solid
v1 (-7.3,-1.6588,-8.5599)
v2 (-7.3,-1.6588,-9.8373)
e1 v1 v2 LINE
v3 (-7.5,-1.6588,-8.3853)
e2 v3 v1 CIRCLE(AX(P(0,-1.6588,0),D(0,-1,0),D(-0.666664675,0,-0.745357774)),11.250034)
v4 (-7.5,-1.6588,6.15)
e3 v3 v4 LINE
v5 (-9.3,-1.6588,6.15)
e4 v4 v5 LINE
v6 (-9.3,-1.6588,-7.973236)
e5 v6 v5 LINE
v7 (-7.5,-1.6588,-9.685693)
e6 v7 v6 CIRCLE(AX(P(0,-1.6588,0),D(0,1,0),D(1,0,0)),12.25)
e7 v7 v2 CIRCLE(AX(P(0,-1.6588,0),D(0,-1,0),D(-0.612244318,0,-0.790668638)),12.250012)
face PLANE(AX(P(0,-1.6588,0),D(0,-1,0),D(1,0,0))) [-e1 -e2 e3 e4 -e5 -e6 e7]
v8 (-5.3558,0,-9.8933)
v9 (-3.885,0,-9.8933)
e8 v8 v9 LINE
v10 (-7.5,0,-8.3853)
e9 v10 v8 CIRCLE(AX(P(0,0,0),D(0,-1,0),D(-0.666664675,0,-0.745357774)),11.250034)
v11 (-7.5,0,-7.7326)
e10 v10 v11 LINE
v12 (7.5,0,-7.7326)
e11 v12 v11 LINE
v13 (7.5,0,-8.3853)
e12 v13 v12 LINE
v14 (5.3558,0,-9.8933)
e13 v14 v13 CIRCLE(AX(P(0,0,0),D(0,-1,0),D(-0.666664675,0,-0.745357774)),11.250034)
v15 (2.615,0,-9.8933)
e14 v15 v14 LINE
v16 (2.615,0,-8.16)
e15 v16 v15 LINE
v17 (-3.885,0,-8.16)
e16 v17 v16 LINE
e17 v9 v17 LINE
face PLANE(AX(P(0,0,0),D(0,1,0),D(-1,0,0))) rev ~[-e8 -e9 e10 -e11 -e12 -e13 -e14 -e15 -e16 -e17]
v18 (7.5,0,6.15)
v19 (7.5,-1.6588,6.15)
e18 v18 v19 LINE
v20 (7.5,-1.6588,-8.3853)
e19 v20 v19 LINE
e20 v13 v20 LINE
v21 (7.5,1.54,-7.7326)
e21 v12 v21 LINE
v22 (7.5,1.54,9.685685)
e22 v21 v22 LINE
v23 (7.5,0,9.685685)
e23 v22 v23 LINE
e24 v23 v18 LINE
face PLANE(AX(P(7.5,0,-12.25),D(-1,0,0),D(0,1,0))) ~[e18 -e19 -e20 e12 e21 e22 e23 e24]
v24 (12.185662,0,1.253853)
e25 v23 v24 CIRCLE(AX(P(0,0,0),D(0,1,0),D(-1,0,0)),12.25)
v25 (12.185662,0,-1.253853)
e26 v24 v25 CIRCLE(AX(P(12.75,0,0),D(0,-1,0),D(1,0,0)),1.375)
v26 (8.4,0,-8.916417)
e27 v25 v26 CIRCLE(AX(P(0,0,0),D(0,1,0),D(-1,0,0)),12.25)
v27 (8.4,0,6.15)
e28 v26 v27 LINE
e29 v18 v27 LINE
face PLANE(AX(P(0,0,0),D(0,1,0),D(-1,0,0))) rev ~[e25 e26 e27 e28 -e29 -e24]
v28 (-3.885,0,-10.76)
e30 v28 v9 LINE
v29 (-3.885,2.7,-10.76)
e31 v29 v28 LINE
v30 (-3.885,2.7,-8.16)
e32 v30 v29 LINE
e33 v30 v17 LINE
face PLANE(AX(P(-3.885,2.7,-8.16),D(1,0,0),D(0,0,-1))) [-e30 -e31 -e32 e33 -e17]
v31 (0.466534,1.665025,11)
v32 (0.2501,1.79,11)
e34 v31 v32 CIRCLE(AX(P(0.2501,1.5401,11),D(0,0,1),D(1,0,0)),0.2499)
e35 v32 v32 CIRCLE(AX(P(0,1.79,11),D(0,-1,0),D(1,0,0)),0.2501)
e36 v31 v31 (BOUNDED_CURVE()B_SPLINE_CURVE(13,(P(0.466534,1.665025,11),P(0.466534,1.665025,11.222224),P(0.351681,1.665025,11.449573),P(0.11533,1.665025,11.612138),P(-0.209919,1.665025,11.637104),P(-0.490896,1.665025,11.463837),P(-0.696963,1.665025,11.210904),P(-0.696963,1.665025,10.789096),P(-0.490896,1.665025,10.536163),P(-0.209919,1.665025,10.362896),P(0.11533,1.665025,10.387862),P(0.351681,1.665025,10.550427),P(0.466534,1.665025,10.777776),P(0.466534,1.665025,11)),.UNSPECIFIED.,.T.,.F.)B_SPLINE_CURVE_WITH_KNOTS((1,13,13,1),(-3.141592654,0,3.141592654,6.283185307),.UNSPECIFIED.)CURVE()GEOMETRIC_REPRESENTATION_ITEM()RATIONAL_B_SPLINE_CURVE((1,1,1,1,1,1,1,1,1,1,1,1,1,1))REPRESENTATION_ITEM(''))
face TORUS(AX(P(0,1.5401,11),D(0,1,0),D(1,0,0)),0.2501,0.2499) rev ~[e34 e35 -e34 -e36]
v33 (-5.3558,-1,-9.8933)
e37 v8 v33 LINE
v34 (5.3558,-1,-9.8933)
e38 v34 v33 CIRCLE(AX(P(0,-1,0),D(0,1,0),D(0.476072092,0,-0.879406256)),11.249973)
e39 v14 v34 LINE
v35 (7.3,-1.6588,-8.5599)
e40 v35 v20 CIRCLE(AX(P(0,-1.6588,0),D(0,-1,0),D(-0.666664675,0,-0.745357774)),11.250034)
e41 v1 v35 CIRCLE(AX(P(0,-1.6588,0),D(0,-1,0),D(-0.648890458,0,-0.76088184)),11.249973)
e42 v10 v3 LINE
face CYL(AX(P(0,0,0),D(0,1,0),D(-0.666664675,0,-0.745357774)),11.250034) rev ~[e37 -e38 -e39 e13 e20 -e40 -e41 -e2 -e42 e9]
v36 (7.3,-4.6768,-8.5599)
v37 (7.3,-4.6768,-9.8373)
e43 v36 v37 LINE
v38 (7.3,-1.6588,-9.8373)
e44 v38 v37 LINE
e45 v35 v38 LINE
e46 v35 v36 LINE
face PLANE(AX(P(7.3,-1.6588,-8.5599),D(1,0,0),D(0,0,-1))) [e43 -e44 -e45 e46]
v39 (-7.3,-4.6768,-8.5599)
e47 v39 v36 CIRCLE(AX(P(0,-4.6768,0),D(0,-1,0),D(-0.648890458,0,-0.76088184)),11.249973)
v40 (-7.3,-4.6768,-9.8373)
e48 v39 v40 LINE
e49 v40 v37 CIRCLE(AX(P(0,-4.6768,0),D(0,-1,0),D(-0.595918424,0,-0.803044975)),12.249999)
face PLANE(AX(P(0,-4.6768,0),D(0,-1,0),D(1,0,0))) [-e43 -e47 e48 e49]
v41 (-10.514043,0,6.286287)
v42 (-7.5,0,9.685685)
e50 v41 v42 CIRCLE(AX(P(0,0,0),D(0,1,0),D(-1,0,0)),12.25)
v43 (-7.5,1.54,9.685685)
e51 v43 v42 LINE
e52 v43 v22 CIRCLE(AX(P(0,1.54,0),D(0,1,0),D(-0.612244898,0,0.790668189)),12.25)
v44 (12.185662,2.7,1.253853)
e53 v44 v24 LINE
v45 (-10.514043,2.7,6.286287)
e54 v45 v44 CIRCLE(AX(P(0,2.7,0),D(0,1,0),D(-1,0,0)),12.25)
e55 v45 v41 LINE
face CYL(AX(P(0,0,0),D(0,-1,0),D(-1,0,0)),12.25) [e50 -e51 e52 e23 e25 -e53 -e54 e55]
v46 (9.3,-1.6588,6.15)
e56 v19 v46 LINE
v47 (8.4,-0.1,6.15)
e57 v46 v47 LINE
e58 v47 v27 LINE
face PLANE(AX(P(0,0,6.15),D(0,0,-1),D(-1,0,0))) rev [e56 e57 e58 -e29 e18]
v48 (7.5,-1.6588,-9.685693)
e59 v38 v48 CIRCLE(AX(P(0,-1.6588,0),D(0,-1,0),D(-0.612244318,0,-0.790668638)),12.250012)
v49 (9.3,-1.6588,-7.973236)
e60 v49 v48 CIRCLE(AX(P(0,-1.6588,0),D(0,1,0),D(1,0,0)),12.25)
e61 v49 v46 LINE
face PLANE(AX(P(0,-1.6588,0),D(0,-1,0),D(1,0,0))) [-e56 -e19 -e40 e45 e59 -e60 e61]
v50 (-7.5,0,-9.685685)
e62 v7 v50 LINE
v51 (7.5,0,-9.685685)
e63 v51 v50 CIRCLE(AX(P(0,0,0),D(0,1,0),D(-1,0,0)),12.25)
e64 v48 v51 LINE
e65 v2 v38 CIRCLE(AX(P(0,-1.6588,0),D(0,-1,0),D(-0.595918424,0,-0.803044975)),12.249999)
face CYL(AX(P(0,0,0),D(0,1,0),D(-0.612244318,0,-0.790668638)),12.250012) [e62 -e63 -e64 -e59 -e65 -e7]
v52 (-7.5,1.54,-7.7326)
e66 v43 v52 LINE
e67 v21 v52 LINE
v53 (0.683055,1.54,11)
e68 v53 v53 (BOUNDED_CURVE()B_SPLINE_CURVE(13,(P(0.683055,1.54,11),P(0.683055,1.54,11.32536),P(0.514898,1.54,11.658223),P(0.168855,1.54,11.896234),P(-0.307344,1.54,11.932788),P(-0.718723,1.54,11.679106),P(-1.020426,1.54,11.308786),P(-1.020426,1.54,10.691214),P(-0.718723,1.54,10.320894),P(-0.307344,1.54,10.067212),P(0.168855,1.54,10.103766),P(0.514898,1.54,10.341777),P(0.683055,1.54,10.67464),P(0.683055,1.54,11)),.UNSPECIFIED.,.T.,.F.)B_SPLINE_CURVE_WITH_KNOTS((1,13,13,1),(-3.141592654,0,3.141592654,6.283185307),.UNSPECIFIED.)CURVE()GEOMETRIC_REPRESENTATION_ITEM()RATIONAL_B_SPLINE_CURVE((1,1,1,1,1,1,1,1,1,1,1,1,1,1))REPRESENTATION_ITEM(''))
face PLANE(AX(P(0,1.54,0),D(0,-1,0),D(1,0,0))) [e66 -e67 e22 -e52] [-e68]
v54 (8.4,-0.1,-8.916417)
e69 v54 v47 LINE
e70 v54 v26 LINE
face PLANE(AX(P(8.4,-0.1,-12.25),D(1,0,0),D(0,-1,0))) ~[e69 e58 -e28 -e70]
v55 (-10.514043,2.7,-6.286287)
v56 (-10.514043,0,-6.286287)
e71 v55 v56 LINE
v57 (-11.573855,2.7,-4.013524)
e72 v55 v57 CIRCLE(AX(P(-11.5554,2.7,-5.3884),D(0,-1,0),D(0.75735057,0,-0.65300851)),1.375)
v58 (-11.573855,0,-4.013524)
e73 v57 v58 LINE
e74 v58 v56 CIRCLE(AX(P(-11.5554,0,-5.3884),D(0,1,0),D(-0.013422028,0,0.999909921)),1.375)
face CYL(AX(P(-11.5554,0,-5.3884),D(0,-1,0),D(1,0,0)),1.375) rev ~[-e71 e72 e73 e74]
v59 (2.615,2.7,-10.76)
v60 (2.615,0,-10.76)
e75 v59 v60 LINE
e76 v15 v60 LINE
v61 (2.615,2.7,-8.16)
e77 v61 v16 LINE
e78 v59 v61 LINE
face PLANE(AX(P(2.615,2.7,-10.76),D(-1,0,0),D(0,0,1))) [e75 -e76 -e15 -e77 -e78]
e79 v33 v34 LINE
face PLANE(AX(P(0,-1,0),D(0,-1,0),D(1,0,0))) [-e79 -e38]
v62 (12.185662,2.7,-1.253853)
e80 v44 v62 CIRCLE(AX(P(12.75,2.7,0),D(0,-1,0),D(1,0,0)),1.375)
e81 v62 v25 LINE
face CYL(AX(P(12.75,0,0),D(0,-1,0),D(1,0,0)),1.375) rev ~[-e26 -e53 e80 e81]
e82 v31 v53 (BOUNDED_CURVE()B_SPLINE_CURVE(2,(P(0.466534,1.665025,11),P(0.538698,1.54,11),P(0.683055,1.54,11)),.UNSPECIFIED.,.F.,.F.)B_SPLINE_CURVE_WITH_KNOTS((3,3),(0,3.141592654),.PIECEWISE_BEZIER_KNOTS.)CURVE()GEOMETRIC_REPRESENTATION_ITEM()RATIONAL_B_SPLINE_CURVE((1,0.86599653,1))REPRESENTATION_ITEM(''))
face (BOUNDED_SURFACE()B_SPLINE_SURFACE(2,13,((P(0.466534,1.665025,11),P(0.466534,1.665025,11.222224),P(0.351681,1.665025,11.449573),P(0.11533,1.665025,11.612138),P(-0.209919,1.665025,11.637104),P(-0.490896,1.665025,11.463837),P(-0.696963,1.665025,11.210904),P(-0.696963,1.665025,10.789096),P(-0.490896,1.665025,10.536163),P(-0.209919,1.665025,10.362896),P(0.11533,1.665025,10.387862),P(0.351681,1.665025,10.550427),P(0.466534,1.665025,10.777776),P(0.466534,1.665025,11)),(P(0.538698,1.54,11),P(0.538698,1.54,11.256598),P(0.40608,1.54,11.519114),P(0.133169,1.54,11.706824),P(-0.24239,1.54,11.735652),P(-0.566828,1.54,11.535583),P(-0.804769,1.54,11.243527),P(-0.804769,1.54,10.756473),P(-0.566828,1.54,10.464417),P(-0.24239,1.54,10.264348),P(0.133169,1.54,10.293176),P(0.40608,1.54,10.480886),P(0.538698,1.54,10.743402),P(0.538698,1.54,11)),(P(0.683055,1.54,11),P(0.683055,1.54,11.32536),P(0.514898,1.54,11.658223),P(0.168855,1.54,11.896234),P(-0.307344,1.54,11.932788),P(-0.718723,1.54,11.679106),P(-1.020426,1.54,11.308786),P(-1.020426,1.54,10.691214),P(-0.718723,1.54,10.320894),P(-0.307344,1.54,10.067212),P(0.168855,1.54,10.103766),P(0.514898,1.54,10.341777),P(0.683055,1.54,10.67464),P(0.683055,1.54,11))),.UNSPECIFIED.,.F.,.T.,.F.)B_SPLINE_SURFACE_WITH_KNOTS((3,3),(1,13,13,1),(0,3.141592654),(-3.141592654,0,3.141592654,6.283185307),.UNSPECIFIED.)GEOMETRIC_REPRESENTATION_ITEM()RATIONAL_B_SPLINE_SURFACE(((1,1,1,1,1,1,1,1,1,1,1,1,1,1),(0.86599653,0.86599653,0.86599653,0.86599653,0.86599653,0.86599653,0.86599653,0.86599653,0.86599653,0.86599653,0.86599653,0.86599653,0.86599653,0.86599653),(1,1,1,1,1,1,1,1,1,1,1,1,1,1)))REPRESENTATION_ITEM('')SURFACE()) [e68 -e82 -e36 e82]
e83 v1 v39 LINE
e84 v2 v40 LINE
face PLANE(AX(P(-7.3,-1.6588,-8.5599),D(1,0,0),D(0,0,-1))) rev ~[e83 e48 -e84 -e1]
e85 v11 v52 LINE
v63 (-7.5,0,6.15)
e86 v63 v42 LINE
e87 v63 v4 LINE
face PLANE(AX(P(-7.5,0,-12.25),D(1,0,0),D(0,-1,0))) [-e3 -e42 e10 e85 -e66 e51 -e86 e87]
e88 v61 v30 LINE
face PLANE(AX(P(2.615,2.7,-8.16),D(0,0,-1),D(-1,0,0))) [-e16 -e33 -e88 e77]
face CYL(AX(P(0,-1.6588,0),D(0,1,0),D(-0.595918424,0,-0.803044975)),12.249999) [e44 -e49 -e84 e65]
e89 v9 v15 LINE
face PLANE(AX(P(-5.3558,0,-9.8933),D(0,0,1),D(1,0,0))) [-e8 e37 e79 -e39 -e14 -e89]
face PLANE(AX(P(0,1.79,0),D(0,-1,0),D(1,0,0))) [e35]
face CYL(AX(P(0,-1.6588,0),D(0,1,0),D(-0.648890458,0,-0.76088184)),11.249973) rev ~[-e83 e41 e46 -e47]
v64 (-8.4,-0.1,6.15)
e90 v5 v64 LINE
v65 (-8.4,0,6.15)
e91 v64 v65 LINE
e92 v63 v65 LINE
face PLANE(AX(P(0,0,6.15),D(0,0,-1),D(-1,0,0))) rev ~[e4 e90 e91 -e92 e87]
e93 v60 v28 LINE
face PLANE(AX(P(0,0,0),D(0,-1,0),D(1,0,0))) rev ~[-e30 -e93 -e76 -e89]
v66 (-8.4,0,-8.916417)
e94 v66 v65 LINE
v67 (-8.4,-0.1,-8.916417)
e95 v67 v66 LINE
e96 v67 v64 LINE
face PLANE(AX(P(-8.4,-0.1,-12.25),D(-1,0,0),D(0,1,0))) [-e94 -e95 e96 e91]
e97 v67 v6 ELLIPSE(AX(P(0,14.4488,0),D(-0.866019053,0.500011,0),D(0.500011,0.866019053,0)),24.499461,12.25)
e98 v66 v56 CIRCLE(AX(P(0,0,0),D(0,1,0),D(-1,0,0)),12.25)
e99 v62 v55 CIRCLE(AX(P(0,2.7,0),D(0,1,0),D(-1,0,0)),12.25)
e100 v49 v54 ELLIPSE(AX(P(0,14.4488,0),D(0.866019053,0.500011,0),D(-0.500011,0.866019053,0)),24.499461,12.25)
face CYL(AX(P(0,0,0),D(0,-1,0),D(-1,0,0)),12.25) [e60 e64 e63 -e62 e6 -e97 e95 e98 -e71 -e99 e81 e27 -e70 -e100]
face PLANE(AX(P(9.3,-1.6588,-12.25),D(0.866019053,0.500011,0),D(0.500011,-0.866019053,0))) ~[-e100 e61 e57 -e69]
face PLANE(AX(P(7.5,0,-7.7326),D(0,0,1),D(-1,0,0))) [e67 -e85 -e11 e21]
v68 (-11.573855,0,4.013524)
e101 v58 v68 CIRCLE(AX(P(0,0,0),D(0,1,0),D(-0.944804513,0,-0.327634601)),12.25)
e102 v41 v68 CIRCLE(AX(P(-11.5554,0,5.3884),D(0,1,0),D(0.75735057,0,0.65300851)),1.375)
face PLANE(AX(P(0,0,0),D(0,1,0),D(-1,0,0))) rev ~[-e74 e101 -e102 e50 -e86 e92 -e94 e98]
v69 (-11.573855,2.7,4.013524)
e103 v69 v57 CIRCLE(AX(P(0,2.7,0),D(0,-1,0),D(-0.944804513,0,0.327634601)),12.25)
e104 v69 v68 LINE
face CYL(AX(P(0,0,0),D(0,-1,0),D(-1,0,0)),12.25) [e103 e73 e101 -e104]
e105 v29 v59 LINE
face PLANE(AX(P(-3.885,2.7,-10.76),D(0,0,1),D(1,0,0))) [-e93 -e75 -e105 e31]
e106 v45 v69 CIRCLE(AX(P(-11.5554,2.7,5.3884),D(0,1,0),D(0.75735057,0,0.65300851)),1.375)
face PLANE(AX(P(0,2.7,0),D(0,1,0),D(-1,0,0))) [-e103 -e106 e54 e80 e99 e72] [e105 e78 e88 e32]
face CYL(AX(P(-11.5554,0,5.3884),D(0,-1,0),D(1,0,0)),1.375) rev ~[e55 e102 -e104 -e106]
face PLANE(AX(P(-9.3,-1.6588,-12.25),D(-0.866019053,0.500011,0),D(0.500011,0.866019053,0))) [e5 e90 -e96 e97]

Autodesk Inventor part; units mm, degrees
ref_plane "YZ Plane" through (0, 0, 0) normal (1, 0, 0) x (0, 1, 0)
ref_plane "XZ Plane" through (0, 0, 0) normal (0, 1, 0) x (-1, 0, 0)
ref_plane "XY Plane" through (0, 0, 0) normal (0, 0, 1) x (1, 0, 0)
sketch "Sketch10" plane through (0, 0, 0) normal (0, 1, 0) x (-1, 0, 0)
  circle A0 centre (0, 0) radius 12.25
  dimension "d115" = 24.5
extrude "Extrusion8" add sketch "Sketch10" along normal blind 2.7
sketch "Sketch15" plane through (0, 0, 0) normal (0, -1, 0) x (1, 0, 0)
  circle A0 centre (0, 0) radius 12.75 construction
  line L0 (12.75, 0) -> (0, 0) construction
  line L1 (0, 0) -> (-11.5554, -5.3884) construction
  line L2 (0, 0) -> (-11.5554, 5.3884) construction
  circle A1 centre (-11.5554, -5.3884) radius 1.375
  circle A2 centre (12.75, 0) radius 1.375
  circle A3 centre (-11.5554, 5.3884) radius 1.375
  dimension "d116" = 25.5
  dimension "d117" = 25
  dimension "d118" = 25
  dimension "d119" = 2.75
extrude "Extrusion13" cut sketch "Sketch15" against normal up to surface (2.7 mm away)
sketch "Sketch17" plane through (0, 2.7, 0) normal (0, 1, 0) x (1, 0, 0)
  line L0 (-3.885, 10.76) -> (2.615, 10.76)
  line L1 (2.615, 10.76) -> (2.615, 8.16)
  line L2 (2.615, 8.16) -> (-3.885, 8.16)
  line L3 (-3.885, 8.16) -> (-3.885, 10.76)
  line L4 (2.615, 8.16) -> (-3.885, 10.76) construction
  line L5 (-3.885, 8.16) -> (2.615, 10.76) construction
  point P0 (0, 0)
  point P1 (-0.635, 9.46)
  dimension "d130" = 2.6
  dimension "d131" = 6.5
  dimension "d144" = 9.46
  dimension "d145" = 0.635
extrude "Extrusion14" cut sketch "Sketch17" against normal up to next
sketch "Sketch11" plane through (0, 0, 0) normal (0, -1, 0) x (1, 0, 0)
  line L0 (7.5, -7.7326) -> (-7.5, -7.7326)
  line L1 (-7.5, -7.7326) -> (-7.5, 12.25)
  line L2 (-7.5, 12.25) -> (7.5, 12.25)
  line L3 (7.5, 12.25) -> (7.5, -7.7326)
  arc A0 (12.1857, 1.2539) -> (12.1857, -1.2539) centre (12.75, 0) ccw projected
  arc A1 (-10.5141, -6.2863) -> (12.1857, -1.2539) centre (0, 0) ccw projected
  arc A2 (-10.5141, -6.2863) -> (-11.5739, -4.0135) centre (-11.5554, -5.3884) ccw projected
  arc A3 (-11.5739, 4.0135) -> (-11.5739, -4.0135) centre (0, 0) ccw projected
  arc A4 (-11.5739, 4.0135) -> (-10.5141, 6.2863) centre (-11.5554, 5.3884) ccw projected
  arc A5 (12.1857, 1.2539) -> (-10.5141, 6.2863) centre (0, 0) ccw projected
  dimension "d78" = 15
  dimension "d122" = 7.5
extrude "Extrusion9" cut sketch "Sketch11" against normal blind 1.54 contours L0 L1 A5 L3 | A5 L2 L3 | L1 L2 A5
ref_plane "Work Plane4" through (0, 0, -12.25) normal (0, 0, -1) x (-1, 0, 0)
ref_plane "Work Plane3" through (0, 0, -7.7326) normal (-1, 0, 0) x (0, 0, 1)
sketch "Sketch13" plane through (0, 0, -12.25) normal (0, 0, -1) x (-1, 0, 0)
  line L0 (-7.5, 1.54) -> (-7.5, 0) projected
  line L1 (-12.1857, 0) -> (-7.5, 0) projected
  line L2 (-12.1857, 0) -> (-12.1857, 2.7) projected
  line L3 (10.5141, 2.7) -> (-12.1857, 2.7) projected
  line L4 (10.5141, 2.7) -> (10.5141, 0) projected
  line L5 (7.5, 0) -> (10.5141, 0) projected
  line L6 (7.5, 0) -> (7.5, 1.54) projected
  line L7 (7.5, 1.54) -> (-7.5, 1.54) projected
  line L8 (7.5, 0) -> (7.5, -1.6588)
  line L9 (7.5, -1.6588) -> (9.3, -1.6588)
  line L10 (9.3, -1.6588) -> (8.4, -0.1)
  line L11 (8.4, -0.1) -> (8.4, 0)
  line L12 (7.5, 0) -> (8.4, 0)
  line L13 (7.5, 0) -> (10.5141, 0) projected
  point P0 (0, 15)
  dimension "d146" = 0.9
  dimension "d147" = 60
  dimension "d148" = 1.8
  dimension "d149" = 0.1
extrude "Extrusion11" add sketch "Sketch13" against normal blind 18.4 contours L5 L11 L10 L9 L8
mirror "Mirror1" about plane through (0, 0, -7.7326) normal (-1, 0, 0) of "Extrusion11"
sketch "Sketch14" plane through (0, 0, 0) normal (0, -1, 0) x (1, 0, 0)
  circle A0 centre (0, 0) radius 12.25
  arc A1 (7.5, 9.6857) -> (-7.5, 9.6857) centre (0, 0) ccw projected
  circle A2 centre (0, 0) radius 24.8523
  point P0 (1.5155, -12.4)
extrude "Extrusion12" cut sketch "Sketch14" along normal up to next
sketch "Sketch19" plane through (0, 0, 0) normal (0, -1, 0) x (1, 0, 0)
  arc A0 (-7.5, -8.3853) -> (7.5, -8.3853) centre (0, 0) ccw
  arc A1 (-7.5, -9.6857) -> (7.5, -9.6857) centre (0, 0) ccw projected
  line L0 (-7.5, -9.6857) -> (-7.5, 6.15) projected
  line L1 (7.5, -9.6857) -> (7.5, 6.15) projected
  point P0 (-7.5, -9.8747)
  point P1 (7.5, -9.8747)
  point P2 (-7.5, -9.7488)
  point P3 (7.5, -9.7488)
  dimension "d141" = 1
extrude "Extrusion15" add sketch "Sketch19" along normal up to surface (1.6588 mm away)
sketch "Sketch21" plane through (0, 1.54, 0) normal (0, -1, 0) x (1, 0, 0)
  circle A0 centre (0, 11) radius 0.5
  point P0 (0, 0)
  dimension "d154" = 11
  dimension "d155" = 1
extrude "Extrusion17" cut sketch "Sketch21" against normal blind 0.25
fillet "Fillet1" radius 0.25 2 edges at (-0.5, 1.79, 11) (-0.5, 1.54, 11)
sketch "Sketch22" plane through (0, -1.6588, 0) normal (0, -1, 0) x (1, 0, 0)
  arc A0 (-7.3, -9.8373) -> (7.3, -9.8373) centre (0, 0) ccw
  arc A1 (-7.3, -8.5599) -> (7.3, -8.5599) centre (0, 0) ccw
  line L0 (-7.3, -8.5599) -> (-7.3, -9.8373)
  line L1 (7.3, -8.5599) -> (7.3, -9.8373)
  arc A2 (-9.3, -7.9732) -> (-7.5, -9.6857) centre (0, 0) ccw projected
  arc A3 (-7.5, -9.6857) -> (7.5, -9.6857) centre (0, 0) ccw projected
  arc A4 (7.5, -9.6857) -> (9.3, -7.9732) centre (0, 0) ccw projected
  line L2 (9.3, -7.9732) -> (9.3, 6.15) projected
  line L3 (9.3, 6.15) -> (7.5, 6.15) projected
  line L4 (7.5, -8.3853) -> (7.5, 6.15) projected
  arc A5 (-7.5, -8.3853) -> (7.5, -8.3853) centre (0, 0) ccw projected
  line L5 (-7.5, -8.3853) -> (-7.5, 6.15) projected
  line L6 (-9.3, 6.15) -> (-7.5, 6.15) projected
  line L7 (-9.3, -7.9732) -> (-9.3, 6.15) projected
  arc A6 (-7.5, -8.3853) -> (7.5, -8.3853) centre (0, 0) ccw projected
  arc A7 (7.5, -9.6857) -> (9.3, -7.9732) centre (0, 0) ccw projected
  dimension "d163" = 0.2
  dimension "d164" = 0.2
extrude "Extrusion18" add sketch "Sketch22" along normal blind 3.018 contours L0 A1 L1 A0
sketch "Sketch23" plane through (0, 0, 0) normal (0, -1, 0) x (1, 0, 0)
  arc A0 (-7.3, -8.5599) -> (7.3, -8.5599) centre (0, 0) ccw projected
  line L0 (-5.3558, -9.8933) -> (5.3558, -9.8933)
  line L1 (2.615, -10.76) -> (-3.284, -10.76) projected
  line L2 (-3.885, -8.16) -> (2.615, -8.16) projected
  dimension "d165" = 0.8667
  dimension "d166" = 2.6
extrude "Extrusion19" add sketch "Sketch23" along normal blind 1
properties part number "bottom2_2" material "Acrylic"
